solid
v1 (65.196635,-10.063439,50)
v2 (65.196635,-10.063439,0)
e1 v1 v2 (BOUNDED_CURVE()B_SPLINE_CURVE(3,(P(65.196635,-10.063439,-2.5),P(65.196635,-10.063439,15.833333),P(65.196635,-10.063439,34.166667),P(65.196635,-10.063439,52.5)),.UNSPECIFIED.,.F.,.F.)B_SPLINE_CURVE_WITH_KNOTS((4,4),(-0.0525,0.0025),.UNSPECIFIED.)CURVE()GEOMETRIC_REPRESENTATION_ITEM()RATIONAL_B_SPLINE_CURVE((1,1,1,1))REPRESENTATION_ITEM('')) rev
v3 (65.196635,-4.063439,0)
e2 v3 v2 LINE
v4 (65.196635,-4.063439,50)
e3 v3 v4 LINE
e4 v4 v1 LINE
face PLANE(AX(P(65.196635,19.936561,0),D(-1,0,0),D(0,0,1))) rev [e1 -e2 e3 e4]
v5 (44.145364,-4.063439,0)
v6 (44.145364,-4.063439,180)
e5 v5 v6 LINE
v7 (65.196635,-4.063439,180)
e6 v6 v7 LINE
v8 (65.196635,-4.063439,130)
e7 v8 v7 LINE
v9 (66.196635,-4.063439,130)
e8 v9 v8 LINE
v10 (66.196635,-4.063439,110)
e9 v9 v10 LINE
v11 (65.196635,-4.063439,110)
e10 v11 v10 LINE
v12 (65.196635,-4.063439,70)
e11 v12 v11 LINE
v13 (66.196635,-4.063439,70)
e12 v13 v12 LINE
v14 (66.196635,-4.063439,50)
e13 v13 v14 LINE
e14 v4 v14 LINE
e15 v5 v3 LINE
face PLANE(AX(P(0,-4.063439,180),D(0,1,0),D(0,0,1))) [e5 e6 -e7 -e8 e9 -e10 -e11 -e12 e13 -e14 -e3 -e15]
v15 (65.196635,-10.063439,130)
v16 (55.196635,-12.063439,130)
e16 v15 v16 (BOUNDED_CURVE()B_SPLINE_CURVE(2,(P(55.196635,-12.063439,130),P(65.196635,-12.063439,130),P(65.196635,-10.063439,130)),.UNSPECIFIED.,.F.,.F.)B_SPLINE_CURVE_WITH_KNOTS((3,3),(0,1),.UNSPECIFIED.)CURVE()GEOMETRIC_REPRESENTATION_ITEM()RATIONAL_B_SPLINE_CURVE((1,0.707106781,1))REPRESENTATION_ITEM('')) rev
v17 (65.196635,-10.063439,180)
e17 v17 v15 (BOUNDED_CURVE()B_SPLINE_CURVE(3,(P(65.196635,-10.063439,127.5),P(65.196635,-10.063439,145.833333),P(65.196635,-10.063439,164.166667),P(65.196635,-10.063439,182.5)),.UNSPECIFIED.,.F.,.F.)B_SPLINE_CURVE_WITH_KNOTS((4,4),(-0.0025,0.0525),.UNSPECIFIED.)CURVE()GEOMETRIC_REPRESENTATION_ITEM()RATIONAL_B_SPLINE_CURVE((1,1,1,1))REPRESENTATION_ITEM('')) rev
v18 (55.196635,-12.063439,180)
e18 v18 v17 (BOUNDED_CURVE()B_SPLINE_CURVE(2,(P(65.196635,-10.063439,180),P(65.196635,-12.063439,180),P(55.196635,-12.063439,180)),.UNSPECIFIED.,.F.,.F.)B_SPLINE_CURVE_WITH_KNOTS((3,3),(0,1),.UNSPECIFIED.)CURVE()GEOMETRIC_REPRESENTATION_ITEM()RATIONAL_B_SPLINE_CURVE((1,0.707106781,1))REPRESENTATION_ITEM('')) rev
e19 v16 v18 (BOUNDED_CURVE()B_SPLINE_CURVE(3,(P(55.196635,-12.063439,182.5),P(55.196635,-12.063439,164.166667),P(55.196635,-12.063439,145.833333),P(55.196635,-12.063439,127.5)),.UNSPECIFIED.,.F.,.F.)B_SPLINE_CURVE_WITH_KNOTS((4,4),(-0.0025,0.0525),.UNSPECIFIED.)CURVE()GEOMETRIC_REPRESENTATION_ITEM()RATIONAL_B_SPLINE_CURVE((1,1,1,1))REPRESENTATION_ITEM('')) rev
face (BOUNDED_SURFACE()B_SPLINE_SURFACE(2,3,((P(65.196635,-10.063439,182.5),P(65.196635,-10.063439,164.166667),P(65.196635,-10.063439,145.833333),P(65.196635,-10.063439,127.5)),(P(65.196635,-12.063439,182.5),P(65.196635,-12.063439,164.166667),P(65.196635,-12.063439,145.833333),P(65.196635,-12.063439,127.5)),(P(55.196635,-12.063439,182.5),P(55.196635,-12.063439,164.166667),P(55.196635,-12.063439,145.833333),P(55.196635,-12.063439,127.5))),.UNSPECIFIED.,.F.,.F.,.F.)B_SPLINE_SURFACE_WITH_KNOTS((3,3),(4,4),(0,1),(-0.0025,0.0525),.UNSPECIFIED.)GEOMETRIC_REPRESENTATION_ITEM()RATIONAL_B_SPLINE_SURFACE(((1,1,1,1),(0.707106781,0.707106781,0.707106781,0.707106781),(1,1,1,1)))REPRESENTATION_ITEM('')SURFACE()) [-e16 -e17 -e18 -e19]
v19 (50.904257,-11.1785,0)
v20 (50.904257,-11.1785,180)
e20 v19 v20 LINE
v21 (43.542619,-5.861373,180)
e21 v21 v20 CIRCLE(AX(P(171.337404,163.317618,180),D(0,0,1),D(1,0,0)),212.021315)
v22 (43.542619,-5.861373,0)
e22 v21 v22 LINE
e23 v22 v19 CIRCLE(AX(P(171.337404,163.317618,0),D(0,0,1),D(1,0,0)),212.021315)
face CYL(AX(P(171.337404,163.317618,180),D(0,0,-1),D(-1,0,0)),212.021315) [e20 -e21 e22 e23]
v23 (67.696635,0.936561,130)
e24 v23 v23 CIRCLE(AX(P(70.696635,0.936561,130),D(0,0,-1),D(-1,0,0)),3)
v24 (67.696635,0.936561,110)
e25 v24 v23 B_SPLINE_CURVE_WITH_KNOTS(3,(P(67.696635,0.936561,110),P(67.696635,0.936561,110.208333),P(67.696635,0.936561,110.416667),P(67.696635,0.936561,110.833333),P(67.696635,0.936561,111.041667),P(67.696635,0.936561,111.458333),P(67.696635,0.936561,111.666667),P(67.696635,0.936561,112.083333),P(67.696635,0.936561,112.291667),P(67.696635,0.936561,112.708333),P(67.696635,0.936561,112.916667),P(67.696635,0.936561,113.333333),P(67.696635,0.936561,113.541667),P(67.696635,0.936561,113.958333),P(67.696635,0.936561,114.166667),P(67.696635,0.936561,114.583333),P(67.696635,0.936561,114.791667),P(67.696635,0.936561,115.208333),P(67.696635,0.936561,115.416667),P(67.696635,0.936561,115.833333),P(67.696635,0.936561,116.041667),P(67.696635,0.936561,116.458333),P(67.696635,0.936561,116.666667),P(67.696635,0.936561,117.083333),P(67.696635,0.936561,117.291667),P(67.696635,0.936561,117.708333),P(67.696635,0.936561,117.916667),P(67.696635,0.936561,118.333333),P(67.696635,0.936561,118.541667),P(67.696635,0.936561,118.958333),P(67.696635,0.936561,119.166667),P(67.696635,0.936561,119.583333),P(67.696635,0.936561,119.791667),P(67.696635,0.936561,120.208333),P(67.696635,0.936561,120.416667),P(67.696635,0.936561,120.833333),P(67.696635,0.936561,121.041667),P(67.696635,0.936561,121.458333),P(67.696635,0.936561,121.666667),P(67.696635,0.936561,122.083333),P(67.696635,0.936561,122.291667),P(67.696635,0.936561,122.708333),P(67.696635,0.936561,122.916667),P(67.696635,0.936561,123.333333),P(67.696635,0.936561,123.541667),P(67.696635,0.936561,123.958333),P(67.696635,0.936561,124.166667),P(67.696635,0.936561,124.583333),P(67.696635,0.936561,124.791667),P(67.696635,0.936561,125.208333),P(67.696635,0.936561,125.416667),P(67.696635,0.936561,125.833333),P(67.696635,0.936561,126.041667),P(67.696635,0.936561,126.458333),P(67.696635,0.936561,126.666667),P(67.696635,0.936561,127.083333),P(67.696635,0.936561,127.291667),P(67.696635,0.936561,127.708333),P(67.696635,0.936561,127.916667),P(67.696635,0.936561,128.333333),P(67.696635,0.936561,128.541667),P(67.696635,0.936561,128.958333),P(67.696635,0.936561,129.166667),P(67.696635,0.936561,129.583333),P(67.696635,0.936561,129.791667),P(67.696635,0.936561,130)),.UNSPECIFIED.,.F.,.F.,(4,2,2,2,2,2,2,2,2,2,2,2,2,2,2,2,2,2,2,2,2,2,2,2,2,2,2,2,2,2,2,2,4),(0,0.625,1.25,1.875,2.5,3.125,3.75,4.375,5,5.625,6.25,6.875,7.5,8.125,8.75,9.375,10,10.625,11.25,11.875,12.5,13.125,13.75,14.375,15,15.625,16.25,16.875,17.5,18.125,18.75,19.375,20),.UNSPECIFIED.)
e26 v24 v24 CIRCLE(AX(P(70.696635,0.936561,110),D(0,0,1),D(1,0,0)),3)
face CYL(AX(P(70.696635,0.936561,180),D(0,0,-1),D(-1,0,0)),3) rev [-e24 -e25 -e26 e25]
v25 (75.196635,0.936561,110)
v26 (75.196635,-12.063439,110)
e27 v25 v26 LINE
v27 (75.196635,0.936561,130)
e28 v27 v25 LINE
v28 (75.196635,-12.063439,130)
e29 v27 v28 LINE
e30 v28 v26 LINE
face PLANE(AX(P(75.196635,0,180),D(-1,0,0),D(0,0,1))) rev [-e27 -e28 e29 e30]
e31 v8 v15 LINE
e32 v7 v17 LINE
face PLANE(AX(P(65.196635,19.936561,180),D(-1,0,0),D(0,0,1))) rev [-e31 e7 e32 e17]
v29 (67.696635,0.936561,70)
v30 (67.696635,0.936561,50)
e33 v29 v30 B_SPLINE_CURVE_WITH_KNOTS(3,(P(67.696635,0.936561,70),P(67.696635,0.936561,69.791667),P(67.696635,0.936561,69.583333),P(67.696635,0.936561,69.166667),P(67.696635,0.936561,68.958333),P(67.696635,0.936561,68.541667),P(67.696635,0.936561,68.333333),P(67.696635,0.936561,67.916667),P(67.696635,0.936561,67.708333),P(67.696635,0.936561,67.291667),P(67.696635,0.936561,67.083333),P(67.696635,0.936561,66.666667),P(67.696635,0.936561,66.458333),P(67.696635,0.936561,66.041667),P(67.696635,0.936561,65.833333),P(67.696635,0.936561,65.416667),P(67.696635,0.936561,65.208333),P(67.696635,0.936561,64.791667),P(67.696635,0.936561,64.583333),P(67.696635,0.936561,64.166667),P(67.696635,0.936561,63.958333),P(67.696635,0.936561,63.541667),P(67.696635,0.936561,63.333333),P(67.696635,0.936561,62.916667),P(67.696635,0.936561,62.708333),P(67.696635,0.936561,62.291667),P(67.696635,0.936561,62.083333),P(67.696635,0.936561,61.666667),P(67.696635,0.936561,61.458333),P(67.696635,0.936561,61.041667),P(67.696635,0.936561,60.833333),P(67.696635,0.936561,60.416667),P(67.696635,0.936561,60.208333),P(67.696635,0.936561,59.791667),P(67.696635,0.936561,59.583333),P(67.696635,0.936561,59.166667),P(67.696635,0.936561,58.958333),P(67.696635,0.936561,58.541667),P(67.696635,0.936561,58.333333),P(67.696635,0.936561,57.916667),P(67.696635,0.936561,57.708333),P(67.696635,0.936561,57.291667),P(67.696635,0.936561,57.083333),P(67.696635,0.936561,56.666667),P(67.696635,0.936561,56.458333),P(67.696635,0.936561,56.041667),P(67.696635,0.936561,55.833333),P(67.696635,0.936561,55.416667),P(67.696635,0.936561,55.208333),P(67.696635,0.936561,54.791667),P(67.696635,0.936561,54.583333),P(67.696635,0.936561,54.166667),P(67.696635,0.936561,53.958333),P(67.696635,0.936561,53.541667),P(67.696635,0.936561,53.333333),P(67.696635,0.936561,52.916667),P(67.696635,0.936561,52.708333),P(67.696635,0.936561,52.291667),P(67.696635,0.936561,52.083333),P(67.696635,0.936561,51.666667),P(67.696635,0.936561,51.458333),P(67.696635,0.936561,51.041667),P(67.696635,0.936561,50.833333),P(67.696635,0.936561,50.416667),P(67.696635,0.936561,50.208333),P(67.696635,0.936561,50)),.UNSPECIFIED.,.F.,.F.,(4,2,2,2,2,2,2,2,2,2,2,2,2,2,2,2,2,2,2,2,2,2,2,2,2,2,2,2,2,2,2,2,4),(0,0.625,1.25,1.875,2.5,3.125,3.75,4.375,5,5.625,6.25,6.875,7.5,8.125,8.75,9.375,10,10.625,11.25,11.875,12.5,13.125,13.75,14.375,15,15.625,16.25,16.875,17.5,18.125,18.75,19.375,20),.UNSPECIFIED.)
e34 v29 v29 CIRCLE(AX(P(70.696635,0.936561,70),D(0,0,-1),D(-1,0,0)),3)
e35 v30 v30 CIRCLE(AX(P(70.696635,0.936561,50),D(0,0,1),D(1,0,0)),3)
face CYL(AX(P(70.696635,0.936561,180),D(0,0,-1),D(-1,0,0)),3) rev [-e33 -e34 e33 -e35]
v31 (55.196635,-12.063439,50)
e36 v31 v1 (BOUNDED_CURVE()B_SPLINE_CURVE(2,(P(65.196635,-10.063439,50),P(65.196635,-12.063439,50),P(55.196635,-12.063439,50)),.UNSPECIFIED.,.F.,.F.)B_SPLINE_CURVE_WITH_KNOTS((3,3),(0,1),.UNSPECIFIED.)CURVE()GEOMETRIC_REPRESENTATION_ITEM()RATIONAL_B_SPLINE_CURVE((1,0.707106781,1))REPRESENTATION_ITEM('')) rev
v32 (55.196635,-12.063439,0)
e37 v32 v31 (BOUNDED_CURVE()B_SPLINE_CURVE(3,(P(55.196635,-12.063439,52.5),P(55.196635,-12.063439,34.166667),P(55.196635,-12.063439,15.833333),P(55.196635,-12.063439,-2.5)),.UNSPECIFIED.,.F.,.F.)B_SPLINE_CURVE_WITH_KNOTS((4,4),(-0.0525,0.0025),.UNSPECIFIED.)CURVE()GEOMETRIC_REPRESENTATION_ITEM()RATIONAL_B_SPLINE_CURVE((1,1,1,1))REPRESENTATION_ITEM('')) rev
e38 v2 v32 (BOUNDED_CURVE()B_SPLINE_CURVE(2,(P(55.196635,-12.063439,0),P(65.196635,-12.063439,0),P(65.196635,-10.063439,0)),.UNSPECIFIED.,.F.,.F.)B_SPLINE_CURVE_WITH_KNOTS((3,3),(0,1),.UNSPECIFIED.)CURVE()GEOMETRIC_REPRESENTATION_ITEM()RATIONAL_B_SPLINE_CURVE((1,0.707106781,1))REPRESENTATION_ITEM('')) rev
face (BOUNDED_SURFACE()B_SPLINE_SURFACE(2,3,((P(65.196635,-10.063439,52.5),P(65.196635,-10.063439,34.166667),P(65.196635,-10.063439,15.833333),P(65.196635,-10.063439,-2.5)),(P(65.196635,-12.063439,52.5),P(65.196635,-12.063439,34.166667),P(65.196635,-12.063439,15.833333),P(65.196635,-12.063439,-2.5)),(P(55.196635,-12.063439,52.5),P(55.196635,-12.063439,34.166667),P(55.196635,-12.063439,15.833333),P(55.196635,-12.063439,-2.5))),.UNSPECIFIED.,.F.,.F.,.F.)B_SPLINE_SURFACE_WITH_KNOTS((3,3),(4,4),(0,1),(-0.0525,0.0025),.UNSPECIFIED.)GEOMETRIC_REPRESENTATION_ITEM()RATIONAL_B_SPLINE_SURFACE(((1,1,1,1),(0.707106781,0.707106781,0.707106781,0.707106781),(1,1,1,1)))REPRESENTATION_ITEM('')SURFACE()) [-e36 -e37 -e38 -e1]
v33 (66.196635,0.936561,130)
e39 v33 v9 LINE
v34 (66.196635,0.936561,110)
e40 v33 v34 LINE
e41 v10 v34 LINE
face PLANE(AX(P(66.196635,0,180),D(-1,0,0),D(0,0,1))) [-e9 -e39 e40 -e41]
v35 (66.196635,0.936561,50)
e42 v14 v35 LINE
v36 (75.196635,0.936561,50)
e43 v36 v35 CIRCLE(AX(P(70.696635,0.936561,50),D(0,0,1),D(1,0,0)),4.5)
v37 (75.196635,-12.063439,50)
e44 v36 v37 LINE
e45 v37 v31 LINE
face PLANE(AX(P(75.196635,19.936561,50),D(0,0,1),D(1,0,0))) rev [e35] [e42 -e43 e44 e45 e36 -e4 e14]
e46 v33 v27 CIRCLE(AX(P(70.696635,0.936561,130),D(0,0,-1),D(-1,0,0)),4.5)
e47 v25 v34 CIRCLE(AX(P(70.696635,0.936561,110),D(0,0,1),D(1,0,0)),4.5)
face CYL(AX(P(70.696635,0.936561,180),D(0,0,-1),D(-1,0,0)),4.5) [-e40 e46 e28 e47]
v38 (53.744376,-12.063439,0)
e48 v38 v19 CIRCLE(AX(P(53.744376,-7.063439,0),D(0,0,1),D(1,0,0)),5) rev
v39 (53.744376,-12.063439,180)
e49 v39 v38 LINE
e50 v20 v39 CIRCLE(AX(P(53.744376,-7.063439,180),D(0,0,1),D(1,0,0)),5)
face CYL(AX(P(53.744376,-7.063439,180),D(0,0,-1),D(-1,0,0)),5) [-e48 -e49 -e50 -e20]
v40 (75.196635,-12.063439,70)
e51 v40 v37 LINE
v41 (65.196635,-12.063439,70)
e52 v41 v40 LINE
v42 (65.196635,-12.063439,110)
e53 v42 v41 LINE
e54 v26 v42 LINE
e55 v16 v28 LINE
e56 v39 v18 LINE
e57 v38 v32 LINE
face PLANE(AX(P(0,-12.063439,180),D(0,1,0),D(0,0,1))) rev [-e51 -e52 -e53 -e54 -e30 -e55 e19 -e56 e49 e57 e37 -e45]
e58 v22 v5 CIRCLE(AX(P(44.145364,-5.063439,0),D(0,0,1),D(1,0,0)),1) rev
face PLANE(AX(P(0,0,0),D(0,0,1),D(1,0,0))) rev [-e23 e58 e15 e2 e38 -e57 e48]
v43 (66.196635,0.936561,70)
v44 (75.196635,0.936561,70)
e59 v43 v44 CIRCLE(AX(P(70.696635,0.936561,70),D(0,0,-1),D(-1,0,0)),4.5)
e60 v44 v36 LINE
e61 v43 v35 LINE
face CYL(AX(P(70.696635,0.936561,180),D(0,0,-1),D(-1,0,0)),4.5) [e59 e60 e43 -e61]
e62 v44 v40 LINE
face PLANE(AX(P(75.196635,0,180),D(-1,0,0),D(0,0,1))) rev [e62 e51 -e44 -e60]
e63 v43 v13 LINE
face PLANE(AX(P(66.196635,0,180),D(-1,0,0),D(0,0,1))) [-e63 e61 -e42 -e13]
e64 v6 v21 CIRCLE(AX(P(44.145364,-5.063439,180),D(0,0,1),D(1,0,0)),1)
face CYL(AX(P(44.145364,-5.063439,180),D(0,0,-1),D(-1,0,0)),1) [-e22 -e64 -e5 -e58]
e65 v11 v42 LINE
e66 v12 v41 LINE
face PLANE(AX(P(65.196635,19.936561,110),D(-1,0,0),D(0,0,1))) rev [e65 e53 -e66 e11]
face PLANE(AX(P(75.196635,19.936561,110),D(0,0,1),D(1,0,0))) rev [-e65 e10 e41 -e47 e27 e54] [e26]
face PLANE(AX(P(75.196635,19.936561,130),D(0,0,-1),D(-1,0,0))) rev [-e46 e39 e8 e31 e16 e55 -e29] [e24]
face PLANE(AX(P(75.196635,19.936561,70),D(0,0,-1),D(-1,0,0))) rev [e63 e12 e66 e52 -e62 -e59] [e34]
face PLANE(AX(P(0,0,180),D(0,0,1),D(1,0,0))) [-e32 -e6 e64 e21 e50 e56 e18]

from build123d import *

# Parameters (mm, degrees)
SKETCH1_R           = 3
BOSS_EXTRUDE2_DEPTH = 180
SKETCH3_W           = 10
SKETCH3_H           = 50
CUT_EXTRUDE1_DEPTH  = 32
SKETCH4_W           = 10
SKETCH4_H           = 40
CUT_EXTRUDE2_DEPTH  = 32
FILLET3_R           = 1
FILLET4_R           = 5
FILLET5_SIZE        = 10
FILLET5_SIZE_2      = 2


with BuildPart() as part:
    # Sketch1 → Boss-Extrude2 (new body)
    # profile 1 of 2: a face of its own
    with BuildSketch(Plane.XY):
        with BuildLine():
            Line((75.196634753, -12.063439291), (75.196634753, 0.936560709))
            ThreePointArc((75.196634753, 0.936560709), (70.696634753, 5.436560709), (66.196634753, 0.936560709))
            Line((66.196634753, 0.936560709), (66.196634753, -4.063439291))
            Line((66.196634753, -4.063439291), (66.196634753, -12.063439291))
            Line((66.196634753, -12.063439291), (75.196634753, -12.063439291))
        make_face()
        with Locations(Location((70.696634753, 0.936560709, 0), (0, 0, 180))):
            Circle(SKETCH1_R, mode=Mode.SUBTRACT)
    # profile 2 of 2: a face of its own
    with BuildSketch(Plane.XY):
        with BuildLine():
            Line((41.196634753, -4.063439291), (66.196634753, -4.063439291))
            Line((66.196634753, -4.063439291), (66.196634753, -12.063439291))
            Line((66.196634753, -12.063439291), (52.196634753, -12.063439291))
            ThreePointArc((52.196634753, -12.063439291), (46.632466814, -8.151670207), (41.196634753, -4.063439291))
        make_face()
    extrude(amount=BOSS_EXTRUDE2_DEPTH)

    # Sketch3 → Cut-Extrude1 (cut)
    with BuildSketch(Plane.XZ.offset(12.063439291)):
        with Locations((70.196634753, 155)):
            Rectangle(SKETCH3_W, SKETCH3_H)
        with Locations((70.196634753, 25)):
            Rectangle(SKETCH3_W, SKETCH3_H)
    extrude(amount=-CUT_EXTRUDE1_DEPTH, mode=Mode.SUBTRACT)

    # Sketch4 → Cut-Extrude2 (cut)
    with BuildSketch(Plane(origin=(0, -12.063439291, 0), x_dir=(-1, 0, 0), z_dir=(0, -1, 0))):
        with Locations((-70.196634753, -90)):
            Rectangle(SKETCH4_W, SKETCH4_H)
    extrude(amount=-CUT_EXTRUDE2_DEPTH, mode=Mode.SUBTRACT)

    # Fillet3
    fillet3_edges = [part.edges().sort_by_distance(p)[0] for p in [
        (41.196634753, -4.063439291, 90),
    ]]
    fillet(fillet3_edges, radius=FILLET3_R)

    # Fillet4
    fillet4_edges = [part.edges().sort_by_distance(p)[0] for p in [
        (52.196634753, -12.063439291, 90),
    ]]
    fillet(fillet4_edges, radius=FILLET4_R)

    # Fillet5
    # an asymmetric fillet: 10, 2 mm, written as the material it takes off along each edge
    with BuildSketch(Plane(origin=(65.196634753, -12.063439291, 205), x_dir=(-1, 0, 0), z_dir=(0, 0, -1))) as fillet5_piece_1:
        with BuildLine():
            Bezier((FILLET5_SIZE, 0), (0, 0), (0, FILLET5_SIZE_2), weights=[1, 0.707106781, 1])
            Line((0, FILLET5_SIZE_2), (0, 0))
            Line((0, 0), (FILLET5_SIZE, 0))
        make_face()
    extrude(amount=75, mode=Mode.SUBTRACT)
    with BuildSketch(Plane(origin=(65.196634753, -12.063439291, -25), x_dir=(-1, 0, 0), z_dir=(0, 0, 1))) as fillet5_piece_2:
        with BuildLine():
            Bezier((FILLET5_SIZE, 0), (0, 0), (0, -FILLET5_SIZE_2), weights=[1, 0.707106781, 1])
            Line((0, -FILLET5_SIZE_2), (0, 0))
            Line((0, 0), (FILLET5_SIZE, 0))
        make_face()
    extrude(amount=75, mode=Mode.SUBTRACT)


solid = part.part
